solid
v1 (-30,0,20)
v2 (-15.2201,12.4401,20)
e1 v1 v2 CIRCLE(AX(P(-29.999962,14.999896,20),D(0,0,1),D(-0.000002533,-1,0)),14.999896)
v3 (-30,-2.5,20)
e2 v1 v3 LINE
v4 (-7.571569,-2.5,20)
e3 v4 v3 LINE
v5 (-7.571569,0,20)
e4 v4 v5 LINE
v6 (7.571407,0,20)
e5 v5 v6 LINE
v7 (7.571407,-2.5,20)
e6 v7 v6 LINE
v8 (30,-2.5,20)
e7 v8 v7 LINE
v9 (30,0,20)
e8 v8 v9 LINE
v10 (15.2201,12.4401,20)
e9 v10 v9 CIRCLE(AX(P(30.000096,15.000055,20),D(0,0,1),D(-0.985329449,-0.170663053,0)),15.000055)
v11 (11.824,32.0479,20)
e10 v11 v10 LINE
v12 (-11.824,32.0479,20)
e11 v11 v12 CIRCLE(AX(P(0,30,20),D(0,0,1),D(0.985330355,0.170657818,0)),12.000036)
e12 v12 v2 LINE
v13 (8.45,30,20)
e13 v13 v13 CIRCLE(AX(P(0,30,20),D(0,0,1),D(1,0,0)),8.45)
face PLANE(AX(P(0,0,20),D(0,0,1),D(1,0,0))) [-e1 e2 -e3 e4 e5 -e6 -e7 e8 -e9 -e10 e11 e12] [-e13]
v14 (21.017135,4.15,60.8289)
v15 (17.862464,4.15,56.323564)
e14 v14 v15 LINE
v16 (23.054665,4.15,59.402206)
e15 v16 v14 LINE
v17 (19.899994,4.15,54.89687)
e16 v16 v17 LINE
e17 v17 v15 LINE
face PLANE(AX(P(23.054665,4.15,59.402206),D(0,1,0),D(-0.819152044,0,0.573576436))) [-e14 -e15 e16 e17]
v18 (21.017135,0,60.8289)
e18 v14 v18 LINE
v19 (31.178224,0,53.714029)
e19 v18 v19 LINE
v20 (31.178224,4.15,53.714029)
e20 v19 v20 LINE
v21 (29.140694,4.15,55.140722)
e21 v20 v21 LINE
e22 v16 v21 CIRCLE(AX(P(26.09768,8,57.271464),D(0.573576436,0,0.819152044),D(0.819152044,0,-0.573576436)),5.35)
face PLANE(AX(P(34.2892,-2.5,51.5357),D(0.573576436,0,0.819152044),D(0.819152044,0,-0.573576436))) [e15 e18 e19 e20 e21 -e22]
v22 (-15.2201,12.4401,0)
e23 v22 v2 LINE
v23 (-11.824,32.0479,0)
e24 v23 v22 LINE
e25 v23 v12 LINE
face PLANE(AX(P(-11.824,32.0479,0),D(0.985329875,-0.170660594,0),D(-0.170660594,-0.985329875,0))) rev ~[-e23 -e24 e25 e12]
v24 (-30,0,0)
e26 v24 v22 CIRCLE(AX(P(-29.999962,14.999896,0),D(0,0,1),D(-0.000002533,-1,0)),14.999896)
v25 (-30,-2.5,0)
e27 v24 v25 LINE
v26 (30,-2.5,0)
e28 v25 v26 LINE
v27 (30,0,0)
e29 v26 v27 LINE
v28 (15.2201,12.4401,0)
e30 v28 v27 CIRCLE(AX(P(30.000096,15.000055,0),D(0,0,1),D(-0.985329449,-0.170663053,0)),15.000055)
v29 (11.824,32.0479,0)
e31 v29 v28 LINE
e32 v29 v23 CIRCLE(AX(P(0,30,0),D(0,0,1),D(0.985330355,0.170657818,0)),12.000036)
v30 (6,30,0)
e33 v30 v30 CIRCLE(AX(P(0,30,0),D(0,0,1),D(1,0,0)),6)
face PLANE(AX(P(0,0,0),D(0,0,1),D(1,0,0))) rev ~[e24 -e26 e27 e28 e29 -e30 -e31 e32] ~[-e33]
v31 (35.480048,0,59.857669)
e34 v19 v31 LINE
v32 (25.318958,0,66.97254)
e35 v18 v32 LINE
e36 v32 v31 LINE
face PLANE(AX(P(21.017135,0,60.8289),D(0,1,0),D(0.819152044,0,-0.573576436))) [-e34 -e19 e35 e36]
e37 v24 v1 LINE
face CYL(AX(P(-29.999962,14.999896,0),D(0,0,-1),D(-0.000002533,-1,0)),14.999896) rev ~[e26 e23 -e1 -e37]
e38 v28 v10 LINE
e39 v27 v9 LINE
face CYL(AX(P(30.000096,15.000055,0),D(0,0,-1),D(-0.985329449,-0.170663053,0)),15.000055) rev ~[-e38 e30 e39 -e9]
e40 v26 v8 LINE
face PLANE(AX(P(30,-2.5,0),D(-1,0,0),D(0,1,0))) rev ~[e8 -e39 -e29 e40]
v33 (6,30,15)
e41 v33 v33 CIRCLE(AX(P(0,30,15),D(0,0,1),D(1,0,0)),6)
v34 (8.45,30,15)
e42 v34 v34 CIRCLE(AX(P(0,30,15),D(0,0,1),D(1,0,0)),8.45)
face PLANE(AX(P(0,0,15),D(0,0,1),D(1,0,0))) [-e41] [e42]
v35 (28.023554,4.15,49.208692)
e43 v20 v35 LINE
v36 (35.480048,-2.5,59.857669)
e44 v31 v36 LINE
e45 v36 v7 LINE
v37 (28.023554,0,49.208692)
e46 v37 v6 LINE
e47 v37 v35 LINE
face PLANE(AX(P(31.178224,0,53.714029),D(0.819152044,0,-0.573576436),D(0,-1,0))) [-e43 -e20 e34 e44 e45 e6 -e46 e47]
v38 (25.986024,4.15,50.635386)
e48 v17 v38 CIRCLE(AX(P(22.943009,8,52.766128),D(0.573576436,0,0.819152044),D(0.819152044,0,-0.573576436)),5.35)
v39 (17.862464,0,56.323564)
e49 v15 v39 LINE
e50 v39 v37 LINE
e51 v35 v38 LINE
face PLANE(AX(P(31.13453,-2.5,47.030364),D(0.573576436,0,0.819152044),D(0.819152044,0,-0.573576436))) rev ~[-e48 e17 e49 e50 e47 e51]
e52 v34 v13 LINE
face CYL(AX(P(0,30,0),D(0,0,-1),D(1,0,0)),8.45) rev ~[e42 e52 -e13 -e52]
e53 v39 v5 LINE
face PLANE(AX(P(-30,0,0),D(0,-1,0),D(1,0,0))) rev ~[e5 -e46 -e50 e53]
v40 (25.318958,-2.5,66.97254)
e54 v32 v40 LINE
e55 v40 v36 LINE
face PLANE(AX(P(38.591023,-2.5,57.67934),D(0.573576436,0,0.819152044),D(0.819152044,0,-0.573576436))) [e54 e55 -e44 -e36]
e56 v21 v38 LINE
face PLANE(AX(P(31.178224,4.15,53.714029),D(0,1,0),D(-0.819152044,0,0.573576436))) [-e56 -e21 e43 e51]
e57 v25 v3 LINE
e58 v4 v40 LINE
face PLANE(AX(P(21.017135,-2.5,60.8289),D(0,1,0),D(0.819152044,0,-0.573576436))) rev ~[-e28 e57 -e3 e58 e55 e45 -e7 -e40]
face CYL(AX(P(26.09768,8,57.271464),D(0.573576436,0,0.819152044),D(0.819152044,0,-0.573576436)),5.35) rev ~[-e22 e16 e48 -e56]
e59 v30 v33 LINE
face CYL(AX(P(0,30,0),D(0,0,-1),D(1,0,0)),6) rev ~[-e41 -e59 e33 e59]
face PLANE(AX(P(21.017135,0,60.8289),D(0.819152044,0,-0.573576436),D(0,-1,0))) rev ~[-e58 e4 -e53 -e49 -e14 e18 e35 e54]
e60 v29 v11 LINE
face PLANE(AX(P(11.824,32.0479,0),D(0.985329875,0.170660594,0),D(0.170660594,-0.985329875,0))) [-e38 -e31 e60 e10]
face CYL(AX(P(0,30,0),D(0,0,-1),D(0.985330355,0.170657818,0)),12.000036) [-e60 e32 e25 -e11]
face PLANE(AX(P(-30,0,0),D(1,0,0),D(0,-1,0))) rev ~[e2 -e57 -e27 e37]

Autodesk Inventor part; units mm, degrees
ref_plane "YZ Plane" through (0, 0, 0) normal (1, 0, 0) x (0, 1, 0)
ref_plane "XZ Plane" through (0, 0, 0) normal (0, 1, 0) x (-1, 0, 0)
ref_plane "XY Plane" through (0, 0, 0) normal (0, 0, 1) x (1, 0, 0)
sketch "Sketch1" plane through (0, 0, 0) normal (0, 0, 1) x (1, 0, 0)
  circle A0 centre (0, 30) radius 8.45
  circle A1 centre (0, 30) radius 6
  arc A2 (-30, 0) -> (-15.2201, 12.4401) centre (-30, 15) ccw
  arc A3 (15.2201, 12.4401) -> (30, 0) centre (30, 15) ccw
  arc A4 (11.824, 32.0479) -> (-11.824, 32.0479) centre (0, 30) ccw
  line L0 (-11.824, 32.0479) -> (-15.2201, 12.4401)
  line L1 (11.824, 32.0479) -> (15.2201, 12.4401)
  line L2 (30, 0) -> (-30, 0)
  line L3 (-30, 0) -> (-30, -2.5)
  line L4 (-30, -2.5) -> (30, -2.5)
  line L5 (30, -2.5) -> (30, 0)
  point P0 (0, 0)
  point P1 (0, 0)
  point P2 (0, 0)
  dimension "d0" = 16.9
  dimension "d1" = 12
  dimension "d2" = 30
  dimension "d3" = 12
  dimension "d4" = 15
  dimension "d5" = 60
  dimension "d6" = 2.5
extrude "Extrusion1" add sketch "Sketch1" along normal blind 20 contours A2 L0 A4 L1 A3 L2
extrude "Extrusion2" add sketch "Sketch1" along normal blind 15 contours A0
extrude "Extrusion3" add sketch "Sketch1" along normal blind 20 contours L2 L5 L4 L3
ref_plane "Work Plane1" through (-30, -2.5, 0) normal (0, -1, 0) x (1, 0, 0)
sketch "Sketch2" plane through (-30, -2.5, 0) normal (0, -1, 0) x (1, 0, 0)
  line L0 (21.55, 20) -> (38.45, 20) projected
  line L1 (30, 20) -> (30, 60) construction
  line L2 (60, 0) -> (60, 20) construction
  line L3 (30, 20) -> (52.9431, 52.7661) construction
  line L4 (47.9062, 63.0072) -> (64.2892, 51.5357)
  line L5 (64.2892, 51.5357) -> (61.1346, 47.0303)
  line L6 (61.1346, 47.0303) -> (44.7515, 58.5018) construction
  line L7 (44.7515, 58.5018) -> (47.9062, 63.0072)
  line L8 (44.7515, 58.5018) -> (17.7923, 20)
  line L9 (41.824, 20) -> (18.176, 20) projected
  line L10 (61.1346, 47.0303) -> (42.2077, 20)
  line L11 (0, 20) -> (60, 20) projected
  point P0 (30, 0)
  dimension "d14" = 35
  dimension "d16" = 5.5
  dimension "d17" = 20
  dimension "d26" = 40
extrude "Extrusion6" add sketch "Sketch2" against normal blind 2.5
sketch "Sketch4" plane through (34.2892, -2.5, 51.5357) normal (0.5735764, 0, 0.819152) x (0.819152, 0, -0.5735764)
  line L0 (-23.103, 0) -> (-34.5746, 0) projected
  circle A0 centre (-10, 10.5) radius 7.3 construction
  circle A1 centre (-10, 10.5) radius 5.35
  line L1 (-16.2022, 2.5) -> (-3.7978, 2.5)
  line L2 (-3.7978, 2.5) -> (-3.7978, 6.65)
  line L3 (-3.7978, 6.65) -> (-16.2022, 6.65)
  line L4 (-16.2022, 6.65) -> (-16.2022, 2.5)
  line L5 (-20, 2.5) -> (0, 2.5) projected
  line L6 (-16.2022, 2.5) -> (-16.2022, 0)
  line L7 (-3.7978, 2.5) -> (-3.7978, 0)
  line L8 (-23.103, 0) -> (26.0461, 0) projected
  line L9 (0, 0) -> (-20, 0) projected
  line L10 (0, 0) -> (0, 2.5) projected
  line L11 (-20, 2.5) -> (0, 2.5) projected
  line L12 (-20, 0) -> (-20, 2.5) projected
  point P0 (1.4715, 2.5)
  point P1 (-10, 2.5)
  point P2 (-6.2852, 6.65)
  point P3 (-13.7148, 6.65)
  point P4 (0, 0)
  point P5 (0, 2.5)
  point P6 (-20, 2.5)
  point P7 (-20, 0)
  point P8 (-16.2022, 2.5)
  dimension "d29" = 14.6
  dimension "d30" = 10.7
  dimension "d31" = 1.5
  dimension "d32" = 8
extrude "Extrusion7" add sketch "Sketch4" against normal blind 5.5 contours A1 L3 L2 L1 L4
extrude "Extrusion8" cut sketch "Sketch4" against normal up to surface contours L6 L8 L12 L5 | L5 L10 L8 L7 surface through (0, 21, 20) normal (0, 0, 1)
extrude "Extrusion9" add sketch "Sketch4" along normal blind 7.5 contours L1 L7 L8 L6
properties part number "Support 1 - V2"
